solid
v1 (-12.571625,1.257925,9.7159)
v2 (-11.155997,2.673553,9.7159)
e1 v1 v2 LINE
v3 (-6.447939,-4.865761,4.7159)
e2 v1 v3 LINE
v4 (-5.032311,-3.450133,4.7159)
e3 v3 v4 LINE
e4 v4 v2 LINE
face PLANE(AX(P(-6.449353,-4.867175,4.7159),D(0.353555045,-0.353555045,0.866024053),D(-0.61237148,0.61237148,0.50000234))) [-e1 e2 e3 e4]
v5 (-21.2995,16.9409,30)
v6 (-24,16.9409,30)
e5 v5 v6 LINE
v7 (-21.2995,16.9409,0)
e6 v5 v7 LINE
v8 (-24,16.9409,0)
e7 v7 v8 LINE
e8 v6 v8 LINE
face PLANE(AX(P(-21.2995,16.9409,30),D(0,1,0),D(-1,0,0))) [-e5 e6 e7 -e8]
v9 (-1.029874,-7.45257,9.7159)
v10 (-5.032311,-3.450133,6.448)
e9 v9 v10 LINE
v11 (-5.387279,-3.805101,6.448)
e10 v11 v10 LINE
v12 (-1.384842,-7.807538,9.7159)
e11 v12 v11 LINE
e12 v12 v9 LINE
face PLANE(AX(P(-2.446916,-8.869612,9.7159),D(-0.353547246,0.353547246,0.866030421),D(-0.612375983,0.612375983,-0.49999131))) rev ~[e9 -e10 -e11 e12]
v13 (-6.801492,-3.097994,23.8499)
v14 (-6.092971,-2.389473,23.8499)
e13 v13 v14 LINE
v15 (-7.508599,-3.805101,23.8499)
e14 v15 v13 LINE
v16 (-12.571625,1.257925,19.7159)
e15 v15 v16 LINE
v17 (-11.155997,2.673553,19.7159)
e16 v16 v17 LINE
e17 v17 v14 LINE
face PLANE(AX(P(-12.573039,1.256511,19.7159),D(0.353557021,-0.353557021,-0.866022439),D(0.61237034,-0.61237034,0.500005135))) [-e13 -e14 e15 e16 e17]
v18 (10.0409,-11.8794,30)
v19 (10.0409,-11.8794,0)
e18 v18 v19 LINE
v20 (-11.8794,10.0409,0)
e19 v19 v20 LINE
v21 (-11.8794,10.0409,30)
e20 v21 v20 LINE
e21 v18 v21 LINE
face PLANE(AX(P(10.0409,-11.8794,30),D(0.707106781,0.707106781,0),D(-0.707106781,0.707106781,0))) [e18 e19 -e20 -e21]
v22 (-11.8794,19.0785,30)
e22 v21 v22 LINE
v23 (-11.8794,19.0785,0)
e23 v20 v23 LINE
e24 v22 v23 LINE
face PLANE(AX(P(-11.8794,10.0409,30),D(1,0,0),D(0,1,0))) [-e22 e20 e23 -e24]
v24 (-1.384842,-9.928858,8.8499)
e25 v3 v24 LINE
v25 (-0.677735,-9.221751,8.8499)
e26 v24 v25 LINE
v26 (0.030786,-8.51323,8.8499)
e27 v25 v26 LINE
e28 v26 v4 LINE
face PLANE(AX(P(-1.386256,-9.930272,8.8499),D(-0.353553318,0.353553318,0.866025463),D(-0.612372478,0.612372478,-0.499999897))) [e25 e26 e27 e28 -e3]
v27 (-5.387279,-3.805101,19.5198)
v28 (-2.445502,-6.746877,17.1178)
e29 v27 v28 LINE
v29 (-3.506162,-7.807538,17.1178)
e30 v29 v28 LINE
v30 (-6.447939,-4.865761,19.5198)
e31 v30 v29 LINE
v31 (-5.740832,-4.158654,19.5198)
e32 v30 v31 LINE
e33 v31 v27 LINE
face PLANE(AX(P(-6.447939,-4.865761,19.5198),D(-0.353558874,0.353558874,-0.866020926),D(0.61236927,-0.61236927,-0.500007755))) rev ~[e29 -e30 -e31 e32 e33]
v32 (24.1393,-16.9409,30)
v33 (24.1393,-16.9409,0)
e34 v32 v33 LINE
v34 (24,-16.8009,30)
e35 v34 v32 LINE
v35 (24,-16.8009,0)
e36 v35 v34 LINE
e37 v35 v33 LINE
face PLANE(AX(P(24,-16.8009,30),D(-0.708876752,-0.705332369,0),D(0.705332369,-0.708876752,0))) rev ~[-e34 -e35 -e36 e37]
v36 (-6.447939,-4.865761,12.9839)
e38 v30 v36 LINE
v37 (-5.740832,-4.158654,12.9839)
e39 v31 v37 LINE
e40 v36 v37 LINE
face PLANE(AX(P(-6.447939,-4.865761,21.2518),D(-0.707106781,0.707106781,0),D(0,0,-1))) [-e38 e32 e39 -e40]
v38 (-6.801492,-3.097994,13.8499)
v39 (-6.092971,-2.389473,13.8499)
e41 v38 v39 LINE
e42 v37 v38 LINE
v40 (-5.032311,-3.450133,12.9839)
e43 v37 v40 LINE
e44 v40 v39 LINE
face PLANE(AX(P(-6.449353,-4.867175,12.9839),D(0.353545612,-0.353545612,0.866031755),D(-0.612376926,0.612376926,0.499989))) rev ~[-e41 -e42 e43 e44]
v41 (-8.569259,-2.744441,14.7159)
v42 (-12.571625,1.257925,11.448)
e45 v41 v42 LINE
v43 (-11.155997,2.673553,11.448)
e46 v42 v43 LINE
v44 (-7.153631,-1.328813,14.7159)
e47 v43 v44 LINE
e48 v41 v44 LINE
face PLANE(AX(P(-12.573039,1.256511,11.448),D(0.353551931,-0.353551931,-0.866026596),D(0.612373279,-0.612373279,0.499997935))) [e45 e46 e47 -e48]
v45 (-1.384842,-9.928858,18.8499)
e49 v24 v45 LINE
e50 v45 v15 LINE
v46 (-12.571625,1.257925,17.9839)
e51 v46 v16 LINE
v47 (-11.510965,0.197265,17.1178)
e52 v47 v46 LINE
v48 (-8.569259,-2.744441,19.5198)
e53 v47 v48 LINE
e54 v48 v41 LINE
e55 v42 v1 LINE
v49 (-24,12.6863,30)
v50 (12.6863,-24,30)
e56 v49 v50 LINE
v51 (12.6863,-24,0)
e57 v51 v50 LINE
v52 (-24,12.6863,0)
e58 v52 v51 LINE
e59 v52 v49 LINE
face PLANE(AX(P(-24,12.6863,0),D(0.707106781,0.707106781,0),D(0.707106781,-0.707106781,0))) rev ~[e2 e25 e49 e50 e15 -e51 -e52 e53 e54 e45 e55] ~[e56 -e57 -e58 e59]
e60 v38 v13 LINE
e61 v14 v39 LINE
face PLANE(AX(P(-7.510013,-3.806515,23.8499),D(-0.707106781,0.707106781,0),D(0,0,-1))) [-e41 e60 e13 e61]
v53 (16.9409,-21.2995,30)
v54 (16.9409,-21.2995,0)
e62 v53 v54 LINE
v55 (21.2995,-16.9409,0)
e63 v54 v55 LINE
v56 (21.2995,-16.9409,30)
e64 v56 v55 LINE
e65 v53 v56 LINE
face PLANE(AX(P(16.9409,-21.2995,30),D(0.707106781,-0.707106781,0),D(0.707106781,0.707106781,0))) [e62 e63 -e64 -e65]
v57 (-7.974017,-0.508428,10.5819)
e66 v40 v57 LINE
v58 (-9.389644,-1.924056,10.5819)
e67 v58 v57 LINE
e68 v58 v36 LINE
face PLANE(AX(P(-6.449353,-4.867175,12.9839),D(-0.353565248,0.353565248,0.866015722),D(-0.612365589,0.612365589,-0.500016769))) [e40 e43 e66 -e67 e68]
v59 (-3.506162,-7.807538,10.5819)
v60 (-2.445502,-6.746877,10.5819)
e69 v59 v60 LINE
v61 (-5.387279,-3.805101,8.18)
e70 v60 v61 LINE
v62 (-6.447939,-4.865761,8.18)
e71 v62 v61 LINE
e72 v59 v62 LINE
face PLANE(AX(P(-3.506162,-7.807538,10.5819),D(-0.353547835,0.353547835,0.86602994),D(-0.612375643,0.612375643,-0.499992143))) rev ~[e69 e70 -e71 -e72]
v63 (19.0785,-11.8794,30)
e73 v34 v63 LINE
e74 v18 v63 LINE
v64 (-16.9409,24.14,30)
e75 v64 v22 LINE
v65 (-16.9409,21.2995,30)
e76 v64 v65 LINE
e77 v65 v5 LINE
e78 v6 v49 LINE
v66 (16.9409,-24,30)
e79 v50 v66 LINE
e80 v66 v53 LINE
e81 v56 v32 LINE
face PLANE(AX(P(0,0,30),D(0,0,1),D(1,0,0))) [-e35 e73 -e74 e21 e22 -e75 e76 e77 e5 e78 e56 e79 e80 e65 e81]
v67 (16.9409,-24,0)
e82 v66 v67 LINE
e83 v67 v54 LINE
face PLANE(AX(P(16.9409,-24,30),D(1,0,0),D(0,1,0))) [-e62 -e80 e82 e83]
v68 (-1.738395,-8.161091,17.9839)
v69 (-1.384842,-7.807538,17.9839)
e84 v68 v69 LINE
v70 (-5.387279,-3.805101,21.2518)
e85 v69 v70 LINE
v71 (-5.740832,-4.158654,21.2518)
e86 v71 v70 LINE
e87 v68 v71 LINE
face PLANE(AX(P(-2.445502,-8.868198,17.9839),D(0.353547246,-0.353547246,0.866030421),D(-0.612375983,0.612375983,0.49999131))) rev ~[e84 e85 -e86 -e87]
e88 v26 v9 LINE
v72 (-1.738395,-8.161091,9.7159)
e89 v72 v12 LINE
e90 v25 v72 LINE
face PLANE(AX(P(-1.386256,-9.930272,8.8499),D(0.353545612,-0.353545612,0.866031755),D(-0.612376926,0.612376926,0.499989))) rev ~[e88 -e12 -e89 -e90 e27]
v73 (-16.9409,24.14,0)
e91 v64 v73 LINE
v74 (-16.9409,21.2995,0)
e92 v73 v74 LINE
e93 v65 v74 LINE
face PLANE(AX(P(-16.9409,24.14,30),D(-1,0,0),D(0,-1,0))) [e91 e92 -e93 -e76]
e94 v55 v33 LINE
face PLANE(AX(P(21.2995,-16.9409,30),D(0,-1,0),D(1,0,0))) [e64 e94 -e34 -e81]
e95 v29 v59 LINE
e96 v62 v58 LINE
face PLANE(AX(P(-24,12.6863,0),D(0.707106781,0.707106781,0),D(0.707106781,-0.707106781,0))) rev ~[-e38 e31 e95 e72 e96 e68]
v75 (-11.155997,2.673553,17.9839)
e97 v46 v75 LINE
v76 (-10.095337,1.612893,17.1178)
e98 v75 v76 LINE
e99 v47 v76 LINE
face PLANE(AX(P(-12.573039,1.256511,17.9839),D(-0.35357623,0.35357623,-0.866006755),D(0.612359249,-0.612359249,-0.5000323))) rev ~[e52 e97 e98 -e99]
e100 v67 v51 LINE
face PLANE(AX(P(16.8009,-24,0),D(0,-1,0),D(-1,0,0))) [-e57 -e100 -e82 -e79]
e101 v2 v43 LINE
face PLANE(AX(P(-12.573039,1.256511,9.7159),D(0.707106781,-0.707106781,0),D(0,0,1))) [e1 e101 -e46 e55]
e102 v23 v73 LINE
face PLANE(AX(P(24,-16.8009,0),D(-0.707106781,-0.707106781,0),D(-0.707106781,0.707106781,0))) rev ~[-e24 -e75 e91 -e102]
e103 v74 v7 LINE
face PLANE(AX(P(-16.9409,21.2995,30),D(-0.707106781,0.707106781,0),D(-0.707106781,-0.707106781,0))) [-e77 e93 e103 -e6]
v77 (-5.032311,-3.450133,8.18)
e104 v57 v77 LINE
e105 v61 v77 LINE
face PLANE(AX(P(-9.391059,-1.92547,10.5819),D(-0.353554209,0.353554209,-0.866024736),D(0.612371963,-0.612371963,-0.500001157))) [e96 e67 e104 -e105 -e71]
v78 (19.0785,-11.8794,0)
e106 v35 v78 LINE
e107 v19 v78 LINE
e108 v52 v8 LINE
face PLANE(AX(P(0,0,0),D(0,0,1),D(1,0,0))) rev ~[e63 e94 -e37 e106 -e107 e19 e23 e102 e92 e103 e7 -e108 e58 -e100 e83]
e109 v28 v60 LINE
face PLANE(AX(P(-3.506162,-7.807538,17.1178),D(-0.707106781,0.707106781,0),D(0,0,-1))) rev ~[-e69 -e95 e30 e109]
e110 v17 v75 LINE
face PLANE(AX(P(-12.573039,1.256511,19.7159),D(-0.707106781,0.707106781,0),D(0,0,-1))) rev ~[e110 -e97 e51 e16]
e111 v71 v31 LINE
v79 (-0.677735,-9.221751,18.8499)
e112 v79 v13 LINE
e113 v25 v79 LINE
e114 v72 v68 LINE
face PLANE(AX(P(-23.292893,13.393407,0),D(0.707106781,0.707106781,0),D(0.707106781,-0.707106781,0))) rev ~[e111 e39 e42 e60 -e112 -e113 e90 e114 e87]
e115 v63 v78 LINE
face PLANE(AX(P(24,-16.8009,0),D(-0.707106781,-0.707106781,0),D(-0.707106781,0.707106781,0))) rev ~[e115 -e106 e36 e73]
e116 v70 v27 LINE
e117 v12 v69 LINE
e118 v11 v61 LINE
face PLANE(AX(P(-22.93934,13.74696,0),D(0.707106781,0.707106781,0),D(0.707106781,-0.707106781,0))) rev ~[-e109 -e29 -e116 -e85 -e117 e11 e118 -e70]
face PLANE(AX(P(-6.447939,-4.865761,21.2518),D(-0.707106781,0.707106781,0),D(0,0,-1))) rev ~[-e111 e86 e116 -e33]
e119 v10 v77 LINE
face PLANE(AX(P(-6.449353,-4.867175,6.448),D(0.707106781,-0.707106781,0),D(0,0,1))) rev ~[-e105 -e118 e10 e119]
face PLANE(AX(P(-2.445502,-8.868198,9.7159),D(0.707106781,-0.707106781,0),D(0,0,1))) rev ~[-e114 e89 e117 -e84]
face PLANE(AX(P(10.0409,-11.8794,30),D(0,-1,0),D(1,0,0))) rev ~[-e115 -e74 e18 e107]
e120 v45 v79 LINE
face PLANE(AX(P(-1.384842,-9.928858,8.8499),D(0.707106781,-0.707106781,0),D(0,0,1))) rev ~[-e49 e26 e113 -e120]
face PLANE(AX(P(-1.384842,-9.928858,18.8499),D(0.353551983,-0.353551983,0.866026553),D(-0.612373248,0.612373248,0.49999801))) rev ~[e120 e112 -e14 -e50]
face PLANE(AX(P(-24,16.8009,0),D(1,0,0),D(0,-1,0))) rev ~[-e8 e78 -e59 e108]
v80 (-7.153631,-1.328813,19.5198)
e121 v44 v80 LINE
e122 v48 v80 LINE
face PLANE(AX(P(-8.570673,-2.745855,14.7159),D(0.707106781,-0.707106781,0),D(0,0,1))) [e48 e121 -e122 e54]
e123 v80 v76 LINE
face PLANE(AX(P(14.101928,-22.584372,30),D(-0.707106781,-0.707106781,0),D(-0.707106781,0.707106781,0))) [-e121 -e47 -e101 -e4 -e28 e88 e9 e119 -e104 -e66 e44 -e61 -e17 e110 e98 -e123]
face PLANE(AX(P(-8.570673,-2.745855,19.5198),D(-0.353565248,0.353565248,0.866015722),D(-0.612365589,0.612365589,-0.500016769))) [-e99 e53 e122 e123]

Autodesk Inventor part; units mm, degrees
ref_plane "YZ Plane" through (0, 0, 0) normal (1, 0, 0) x (0, 1, 0)
ref_plane "XZ Plane" through (0, 0, 0) normal (0, 1, 0) x (-1, 0, 0)
sketch "Sketch1" plane through (0, 0, 0) normal (0, 0, 1) x (1, 0, 0)
  line L0 (-16.8009, 21.2415) -> (21.2415, -16.8009)
  line L1 (21.2415, -16.8009) -> (16.8009, -21.2415)
  line L2 (16.8009, -21.2415) -> (-21.2415, 16.8009)
  line L3 (-21.2415, 16.8009) -> (-16.8009, 21.2415)
  line L4 (-16.8009, 21.2415) -> (16.8009, -21.2415) construction
  line L5 (21.2415, -16.8009) -> (-21.2415, 16.8009) construction
  line L6 (-16.8009, 21.2415) -> (36.9991, 21.2415) construction
  line L7 (-21.2415, 16.8009) -> (-24, 16.8009)
  line L8 (16.8009, -21.2415) -> (16.8009, -24)
  line L9 (16.8009, -24) -> (-24, 16.8009)
  line L10 (-16.8009, 21.2415) -> (-16.8009, 24)
  line L11 (21.2415, -16.8009) -> (24, -16.8009)
  line L12 (24, -16.8009) -> (-16.8009, 24)
  line L13 (-24, 16.8009) -> (-24, 12.6863)
  line L14 (16.8009, -24) -> (12.6863, -24)
  line L15 (-24, 12.6863) -> (12.6863, -24)
  line L16 (-24, 16.8009) -> (-11.8721, 28.9288) construction
  line L17 (-24, 16.8009) -> (-6.8486, 16.8009) construction
  point P0 (0, 0)
  dimension "d0" = 53.8
  dimension "d1" = 45
  dimension "d2" = 6.28
  dimension "d5" = 8
  dimension "d72" = 24
  dimension "d73" = 45
extrude "Extrusion1" add sketch "Sketch1" along normal blind 30
ref_plane "Work Plane1" through (16.9, -16.9, -8) normal (-0.7071068, -0.7071068, 0) x (0, 0, 1)
sketch "Sketch7" plane through (0, 0, 30) normal (0, 0, 1) x (1, 0, 0)
  line L0 (21.2415, -16.8009) -> (24, -16.8009) projected
  line L1 (24, -16.8009) -> (-16.8009, 24) projected
  line L2 (-16.8009, 24) -> (-16.8009, 21.2415) projected
  line L3 (-16.8009, 21.2415) -> (-21.2415, 16.8009) projected
  line L4 (-21.2415, 16.8009) -> (-24, 16.8009) projected
  line L5 (-24, 16.8009) -> (-24, 12.6863) projected
  line L6 (-24, 12.6863) -> (12.6863, -24) projected
  line L7 (12.6863, -24) -> (16.8009, -24) projected
  line L8 (16.8009, -24) -> (16.8009, -21.2415) projected
  line L9 (16.8009, -21.2415) -> (21.2415, -16.8009) projected
  line L10 (3.5996, 3.5996) -> (-5.6569, -5.6569)
  line L11 (-24, 12.6863) -> (12.6863, -24) projected
  line L12 (19.0785, -2.8418) -> (10.0409, -11.8794)
  line L13 (10.0409, -11.8794) -> (-11.8794, 10.0409)
  line L14 (-11.8794, 10.0409) -> (-2.8418, 19.0785)
  line L15 (-2.8418, 19.0785) -> (19.0785, -2.8418)
  line L16 (19.0785, -2.8418) -> (-11.8794, 10.0409) construction
  line L17 (10.0409, -11.8794) -> (-2.8418, 19.0785) construction
  line L18 (-11.8794, 10.0409) -> (-11.8794, 19.0785)
  line L19 (24, -16.8009) -> (-16.8009, 24) projected
  line L20 (10.0409, -11.8794) -> (19.0785, -11.8794)
  point P0 (0, 0)
  dimension "d28" = 31
  dimension "d29" = 1.3
  dimension "d74" = 0
extrude "Extrusion7" cut sketch "Sketch7" against normal through all contours L20 L12 L1 | L12 L13 L10 L1 | L1 L14 L15 L12 | L10 L13 L14 L1 | L14 L18 L1
sketch "Sketch10" plane through (12.6863, -24, 30) normal (-0.7071068, -0.7071068, 0) x (-0.7071068, 0.7071068, 0)
  line L0 (1.6838, 16.5215) -> (7.0744, 19.4702) construction
  line L1 (7.0744, 19.4702) -> (7.0744, 10.5304) construction
  line L2 (7.0744, 10.5304) -> (1.6838, 10.5304) construction
  line L3 (1.6838, 10.5304) -> (1.6838, 6.839) construction
  line L4 (1.6838, 6.839) -> (6.7206, 6.839) construction
  line L5 (6.7206, 6.839) -> (6.7206, 1.2092) construction
  line L6 (6.7206, 1.2092) -> (1.6838, 1.2092) construction
  line L7 (1.6838, 1.2092) -> (1.6838, -3.423) construction
  line L8 (1.6838, -3.423) -> (55.1934, -3.423) construction
  line L9 (1.6838, 30.377) -> (1.6838, 26.2152) construction
  line L10 (1.6838, 26.2152) -> (7.1181, 26.2152) construction
  line L11 (7.1181, 26.2152) -> (7.1181, 20.0634) construction
  line L12 (7.1181, 20.0634) -> (1.6838, 20.0634) construction
  line L13 (1.6838, 20.0634) -> (1.6838, 16.5215) construction
  line L14 (7.0744, 15.0003) -> (55.1934, 14.9149) construction
  line L15 (1.6838, 30.377) -> (36.6838, 30.377) construction
  line L16 (36.6838, -3.423) -> (1.6838, -3.423) construction
  line L17 (19.8996, 21.1501) -> (19.8996, 11.1501)
  line L18 (19.8996, 11.1501) -> (28.5599, 6.1501)
  line L19 (19.8996, 21.1501) -> (21.3996, 20.2841)
  line L20 (21.3996, 20.2841) -> (21.3996, 12.0161)
  line L21 (21.3996, 12.0161) -> (27.0599, 8.7482)
  line L22 (27.0599, 8.7482) -> (27.0599, 17.0161)
  line L23 (27.0599, 17.0161) -> (28.5599, 16.1501)
  line L24 (28.5599, 16.1501) -> (28.5599, 6.1501)
  line L25 (51.8823, 0) -> (0, 0) construction
  line L26 (51.8823, 30) -> (51.8823, 0) construction
  line L27 (51.8823, 15) -> (0, 15) construction
  line L28 (0, 30) -> (0, 0) construction
  point P0 (25.9411, 30)
  point P1 (25.9411, 15)
  dimension "d40" = 1.5
  dimension "d41" = 1.5
  dimension "d42" = 1.5
  dimension "d43" = 10
  dimension "d44" = 10
  dimension "d75" = 8.268
  dimension "d76" = 120
emboss "Emboss1" sketch "Sketch10" operation cut depth 1 direction (0.7071068, 0.7071068, 0)
sketch "Sketch11" plane through (12.6863, -24, 30) normal (-0.7071068, -0.7071068, 0) x (-0.7071068, 0.7071068, 0)
  line L0 (21.3996, 12.0161) -> (27.0599, 8.7482) construction
  line L1 (27.0599, 8.7482) -> (27.0599, 17.0161) construction
  line L2 (27.0599, 17.0161) -> (28.5599, 16.1501) construction
  line L3 (28.5599, 16.1501) -> (28.5599, 6.1501) construction
  line L4 (28.5599, 6.1501) -> (19.8996, 11.1501) construction
  line L5 (19.8996, 11.1501) -> (19.8996, 21.1501) construction
  line L6 (19.8996, 21.1501) -> (21.3996, 20.2841) construction
  line L7 (21.3996, 20.2841) -> (21.3996, 12.0161) construction
  line L8 (0, 30) -> (51.8823, 30) construction
  line L9 (0, 30) -> (0, 0) construction
  line L10 (51.8823, 0) -> (0, 0) construction
  line L11 (51.8823, 30) -> (51.8823, 0) construction
  line L12 (9.2379, 27.3057) -> (21.3996, 20.2841) construction
  line L13 (21.3996, 20.2841) -> (21.3996, 12.0161) construction
  line L14 (21.3996, 12.0161) -> (27.0599, 8.7482) construction
  line L15 (27.0599, 8.7482) -> (27.0599, 7.4216) construction
  line L16 (27.0599, 7.4216) -> (17.8982, 13.0177) construction
  line L17 (17.8982, 13.0177) -> (17.8982, 3.0177) construction
  line L18 (17.8982, 3.0177) -> (9.2379, 8.0177) construction
  line L19 (9.2379, 8.0177) -> (9.2379, 27.3057) construction
  line L20 (15.5651, 18.4016) -> (15.5, -16.9) construction
  line L21 (15.5651, 18.4016) -> (-17.5, 16.9) construction
  line L22 (-17.5, 16.9) -> (-17.5, 12.7382) construction
  line L23 (-17.5, 12.7382) -> (-12.0658, 12.7382) construction
  line L24 (-12.0658, 12.7382) -> (-12.0658, 6.5864) construction
  line L25 (-12.0658, 6.5864) -> (-17.5, 6.5864) construction
  line L26 (-17.5, 6.5864) -> (-17.5, 3.0446) construction
  line L27 (-17.5, 3.0446) -> (-12.1095, 3.0446) construction
  line L28 (-12.1095, 3.0446) -> (-12.1095, -2.9465) construction
  line L29 (-12.1095, -2.9465) -> (-17.5, -2.9465) construction
  line L30 (-17.5, -2.9465) -> (-17.5, -6.638) construction
  line L31 (-17.5, -6.638) -> (-12.4632, -6.638) construction
  line L32 (-12.4632, -6.638) -> (-12.4632, -12.2678) construction
  line L33 (-12.4632, -12.2678) -> (-17.5, -12.2678) construction
  line L34 (-17.5, -12.2678) -> (-17.5, -16.9) construction
  line L35 (-17.5, -16.9) -> (15.5, -16.9) construction
  line L36 (-12.1095, 0.049) -> (15.5326, 0.7508) construction
  line L37 (15.5, -16.9) -> (15.5651, 18.4016) construction
  line L38 (1.91, 17.7815) -> (1.91, -16.9) construction
  line L39 (15.5, -16.9) -> (-17.5, -16.9) construction
  line L40 (27.0599, 8.7482) -> (27.0599, 7.4216) construction
  line L41 (21.3996, 20.2841) -> (21.3996, 12.0161)
  line L42 (21.3996, 12.0161) -> (27.0599, 8.7482)
  line L43 (21.3996, 20.2841) -> (21.3996, 12.0161)
  line L44 (21.3996, 12.0161) -> (27.0599, 8.7482)
  line L45 (27.0599, 8.7482) -> (27.0599, 10.4802)
  line L46 (27.0599, 8.7482) -> (27.0599, 7.4216)
  line L47 (27.0599, 10.4802) -> (22.8996, 12.8822)
  line L48 (22.8996, 12.8822) -> (22.8996, 19.4181)
  line L49 (22.8996, 19.4181) -> (27.0599, 21.82)
  line L50 (21.3996, 20.2841) -> (27.0599, 23.552)
  line L51 (27.0599, 23.552) -> (27.0599, 21.82)
  point P0 (25.9411, 30)
  point P1 (20.9754, 14.9785)
  dimension "d47" = 120
  dimension "d48" = 1.5
  dimension "d49" = 1.5
  dimension "d50" = 1.5
  dimension "d77" = 8.268
  dimension "d78" = 4.1602
  dimension "d79" = 5.6602
  dimension "d80" = 120
  dimension "d81" = 120
emboss "Emboss2" sketch "Sketch11" operation cut depth 1.5 direction (0.7071068, 0.7071068, 0)
sketch "Sketch12" plane through (12.6863, -24, 30) normal (-0.7071068, -0.7071068, 0) x (-0.7071068, 0.7071068, 0)
  line L0 (22.8996, 12.8822) -> (27.0599, 10.4802) construction
  line L1 (27.0599, 10.4802) -> (27.0599, 17.0161) construction
  line L2 (27.0599, 17.0161) -> (28.5599, 16.1501) construction
  line L3 (28.5599, 16.1501) -> (28.5599, 6.1501) construction
  line L4 (28.5599, 6.1501) -> (19.8996, 11.1501) construction
  line L5 (19.8996, 11.1501) -> (19.8996, 21.1501) construction
  line L6 (19.8996, 21.1501) -> (21.3996, 20.2841) construction
  line L7 (21.3996, 20.2841) -> (27.0599, 23.552) construction
  line L8 (27.0599, 23.552) -> (27.0599, 21.82) construction
  line L9 (27.0599, 21.82) -> (22.8996, 19.4181) construction
  line L10 (22.8996, 19.4181) -> (22.8996, 12.8822) construction
  line L11 (0, 30) -> (51.8823, 30) construction
  line L12 (0, 30) -> (0, 0) construction
  line L13 (51.8823, 0) -> (0, 0) construction
  line L14 (51.8823, 30) -> (51.8823, 0) construction
  line L15 (12.7689, 9.4432) -> (16.9291, 7.0413) construction
  line L16 (16.9291, 7.0413) -> (27.0599, 17.0161) construction
  line L17 (27.0599, 17.0161) -> (28.5599, 16.1501) construction
  line L18 (28.5599, 16.1501) -> (28.5599, 6.1501) construction
  line L19 (28.5599, 6.1501) -> (13.0911, 5.9826) construction
  line L20 (13.0911, 5.9826) -> (19.8996, 21.1501) construction
  line L21 (19.8996, 21.1501) -> (21.3996, 20.2841) construction
  line L22 (21.3996, 20.2841) -> (27.0599, 23.552) construction
  line L23 (27.0599, 23.552) -> (27.0599, 21.82) construction
  line L24 (27.0599, 21.82) -> (12.7689, 15.9791) construction
  line L25 (12.7689, 15.9791) -> (12.7689, 9.4432) construction
  line L26 (-17.5, 16.9) -> (-17.5, 12.7382) construction
  line L27 (-17.5, 12.7382) -> (-12.0658, 12.7382) construction
  line L28 (-12.0658, 12.7382) -> (-12.0658, 6.5864) construction
  line L29 (-12.0658, 6.5864) -> (-17.5, 6.5864) construction
  line L30 (-17.5, 6.5864) -> (-17.5, 3.0446) construction
  line L31 (-17.5, 3.0446) -> (-12.1095, 3.0446) construction
  line L32 (-12.1095, 3.0446) -> (-12.1095, -2.9465) construction
  line L33 (-12.1095, -2.9465) -> (-17.5, -2.9465) construction
  line L34 (-17.5, -2.9465) -> (-17.5, -6.638) construction
  line L35 (-17.5, -6.638) -> (-12.4632, -6.638) construction
  line L36 (-12.4632, -6.638) -> (-12.4632, -12.2678) construction
  line L37 (-12.4632, -12.2678) -> (-17.5, -12.2678) construction
  line L38 (-17.5, -12.2678) -> (-17.5, -16.9) construction
  line L39 (-17.5, -16.9) -> (15.5, -16.9) construction
  line L40 (21.3996, 20.2841) -> (27.0599, 23.552)
  line L41 (19.8996, 21.1501) -> (21.3996, 20.2841)
  line L42 (21.3996, 20.2841) -> (27.0599, 23.552)
  line L43 (27.0599, 23.552) -> (27.0599, 21.82)
  line L44 (27.0599, 23.552) -> (27.0599, 21.82)
  line L45 (16.9291, 7.0413) -> (27.0599, 17.0161) construction
  line L46 (19.8996, 21.1501) -> (27.0599, 25.2841)
  line L47 (27.0599, 25.2841) -> (35.7201, 20.2841)
  line L48 (35.7201, 20.2841) -> (35.7201, 18.552)
  line L49 (35.7201, 18.552) -> (30.0599, 15.2841)
  line L50 (30.0599, 15.2841) -> (30.0599, 10.4802)
  line L51 (30.0599, 10.4802) -> (34.2201, 12.8822)
  line L52 (35.7201, 10.2841) -> (35.7201, 10.2841)
  line L53 (35.7201, 10.2841) -> (28.5599, 6.1501)
  line L54 (27.0599, 17.0161) -> (28.5599, 16.1501)
  line L55 (28.5599, 6.1501) -> (28.5599, 16.1501)
  line L56 (28.5599, 16.1501) -> (27.0599, 17.0161)
  line L57 (27.0599, 21.82) -> (27.0599, 23.552)
  line L58 (28.5599, 16.1501) -> (28.5599, 6.1501)
  line L59 (27.0599, 17.0161) -> (31.2201, 19.4181)
  line L60 (31.2201, 19.4181) -> (27.0599, 21.82)
  line L61 (13.0911, 5.9826) -> (28.5599, 6.1501) construction
  line L62 (12.7689, 9.4432) -> (16.9291, 7.0413) construction
  line L63 (12.7689, 9.4432) -> (28.5599, 9.6142) construction
  line L64 (28.5599, 9.6142) -> (29.486, 10.1489) construction
  line L65 (28.5599, 16.1501) -> (35.7201, 20.2841) construction
  line L66 (28.5599, 6.1501) -> (34.2971, 9.4625) construction
  line L67 (31.2201, 19.4181) -> (35.3769, 18.7502) construction
  line L68 (27.0599, 23.552) -> (27.0599, 21.82) construction
  line L69 (35.3769, 18.7502) -> (27.0599, 23.552) construction
  line L70 (35.7201, 10.2841) -> (35.7201, 12.0161)
  line L71 (35.7201, 12.0161) -> (34.2201, 12.8822)
  line L72 (16.3223, 7.4494) -> (20.4826, 5.0475) construction
  line L73 (16.3223, 13.9853) -> (16.3223, 7.4494) construction
  line L74 (20.4826, 16.3872) -> (16.3223, 13.9853) construction
  line L75 (20.4826, 18.1193) -> (20.4826, 16.3872) construction
  line L76 (14.8223, 14.8513) -> (20.4826, 18.1193) construction
  line L77 (14.8223, 15.7065) -> (14.8223, 14.8513) construction
  line L78 (20.4826, 12.5307) -> (14.8223, 15.7065) construction
  line L79 (20.4826, 5.0475) -> (20.4826, 12.5307) construction
  line L80 (20.4826, 12.5307) -> (28.5599, 7.9987) construction
  line L81 (28.5599, 7.9987) -> (33.93, 11.0117) construction
  point P0 (25.9411, 30)
  point P1 (20.9754, 14.9785)
  dimension "d54" = 60
  dimension "d55" = 1.5
  dimension "d57" = 120
  dimension "d58" = 1.5
  dimension "d59" = 120
  dimension "d82" = 3
  dimension "d83" = 3
  dimension "d84" = 3
  dimension "d85" = 1.5
  dimension "d86" = 7.1602
  dimension "d87" = 7.1602
  dimension "d88" = 4.1602
  dimension "d89" = 1.7321
  dimension "d90" = 5.6602
  dimension "d91" = 1.7321
  dimension "d92" = 4.1602
extrude "Extrusion9" cut sketch "Sketch12" against normal blind 2
sketch "Sketch13" plane through (0, 0, 30) normal (0, 0, 1) x (1, 0, 0)
  line L0 (-11.8794, 19.0785) -> (-16.8009, 24) construction
  line L1 (-16.8009, 24) -> (-16.8009, 21.2415) projected
  line L2 (-16.8009, 21.2415) -> (-21.2415, 16.8009) projected
  line L3 (-21.2415, 16.8009) -> (-24, 16.8009) projected
  line L4 (-24, 16.8009) -> (-24, 12.6863) construction
  line L5 (-24, 12.6863) -> (12.6863, -24) construction
  line L6 (12.6863, -24) -> (16.8009, -24) construction
  line L7 (16.8009, -24) -> (16.8009, -21.2415) projected
  line L8 (16.8009, -21.2415) -> (21.2415, -16.8009) projected
  line L9 (21.2415, -16.8009) -> (24, -16.8009) projected
  line L10 (24.1, -24.6971) -> (24.1, -16.7029) construction
  line L11 (24.1, -16.7029) -> (-16.9409, 24.338) construction
  line L12 (-16.9409, 24.338) -> (-16.9409, 21.2995)
  line L13 (-16.9409, 21.2995) -> (-21.2995, 16.9409)
  line L14 (-21.2995, 16.9409) -> (-24.14, 16.9409)
  line L15 (-24.14, 16.9409) -> (-24.14, 12.6283) construction
  line L16 (-24.14, 12.6283) -> (12.6283, -24.14) construction
  line L17 (12.6283, -24.14) -> (16.9409, -24.14) construction
  line L18 (16.9409, -24.14) -> (16.9409, -21.2995)
  line L19 (16.9409, -21.2995) -> (21.2995, -16.9409)
  line L20 (21.2995, -16.9409) -> (24.2814, -16.9409)
  line L21 (24.2814, -16.9409) -> (53.8994, -46.5588) construction
  line L22 (53.8994, -46.5588) -> (45.9617, -46.5588) construction
  line L23 (45.9617, -46.5588) -> (24.1, -24.6971) construction
  line L24 (16.8009, -24) -> (16.9409, -24)
  line L25 (24, -16.8009) -> (24.1393, -16.9409)
  line L26 (-21.2415, 16.8009) -> (-22.9, 16.8009) projected
  line L27 (19.0785, -11.8794) -> (10.0409, -11.8794) projected
  line L28 (10.0409, -11.8794) -> (-11.8794, 10.0409) projected
  line L29 (-11.8794, 10.0409) -> (-11.8794, 19.0785) projected
  line L30 (24, -16.8009) -> (19.0785, -11.8794) projected
  line L31 (-24, 12.6863) -> (-24, 16.8009) projected
  line L32 (-24, 16.8009) -> (-24, 16.9409)
  line L33 (-16.8009, 24) -> (-16.9409, 24.14)
  point P0 (0, 0)
  point P1 (-22.9, 16.9409)
  dimension "d93" = 0.14
extrude "IM_offset" add sketch "Sketch13" against normal up to surface (30 mm away)
equation "\"d3\" = MirrorThickness1"
equation "\"d41\" = d40"
equation "\"d42\" = d40"
equation "\"d44\" = d43"
equation "\"d48\" = d51"
equation "\"d49\" = d51"
equation "\"d50\" = d51"
equation "\"d55\" = d60"
equation "\"d58\" = d60"
equation "\"MirrorThickness1\" = 30"
equation "\"d51\" = 1.5"
equation "\"d60\" = 1.5"
properties part number "20_Cube_Insert_Mirror_Holder_wLogo_v3"
